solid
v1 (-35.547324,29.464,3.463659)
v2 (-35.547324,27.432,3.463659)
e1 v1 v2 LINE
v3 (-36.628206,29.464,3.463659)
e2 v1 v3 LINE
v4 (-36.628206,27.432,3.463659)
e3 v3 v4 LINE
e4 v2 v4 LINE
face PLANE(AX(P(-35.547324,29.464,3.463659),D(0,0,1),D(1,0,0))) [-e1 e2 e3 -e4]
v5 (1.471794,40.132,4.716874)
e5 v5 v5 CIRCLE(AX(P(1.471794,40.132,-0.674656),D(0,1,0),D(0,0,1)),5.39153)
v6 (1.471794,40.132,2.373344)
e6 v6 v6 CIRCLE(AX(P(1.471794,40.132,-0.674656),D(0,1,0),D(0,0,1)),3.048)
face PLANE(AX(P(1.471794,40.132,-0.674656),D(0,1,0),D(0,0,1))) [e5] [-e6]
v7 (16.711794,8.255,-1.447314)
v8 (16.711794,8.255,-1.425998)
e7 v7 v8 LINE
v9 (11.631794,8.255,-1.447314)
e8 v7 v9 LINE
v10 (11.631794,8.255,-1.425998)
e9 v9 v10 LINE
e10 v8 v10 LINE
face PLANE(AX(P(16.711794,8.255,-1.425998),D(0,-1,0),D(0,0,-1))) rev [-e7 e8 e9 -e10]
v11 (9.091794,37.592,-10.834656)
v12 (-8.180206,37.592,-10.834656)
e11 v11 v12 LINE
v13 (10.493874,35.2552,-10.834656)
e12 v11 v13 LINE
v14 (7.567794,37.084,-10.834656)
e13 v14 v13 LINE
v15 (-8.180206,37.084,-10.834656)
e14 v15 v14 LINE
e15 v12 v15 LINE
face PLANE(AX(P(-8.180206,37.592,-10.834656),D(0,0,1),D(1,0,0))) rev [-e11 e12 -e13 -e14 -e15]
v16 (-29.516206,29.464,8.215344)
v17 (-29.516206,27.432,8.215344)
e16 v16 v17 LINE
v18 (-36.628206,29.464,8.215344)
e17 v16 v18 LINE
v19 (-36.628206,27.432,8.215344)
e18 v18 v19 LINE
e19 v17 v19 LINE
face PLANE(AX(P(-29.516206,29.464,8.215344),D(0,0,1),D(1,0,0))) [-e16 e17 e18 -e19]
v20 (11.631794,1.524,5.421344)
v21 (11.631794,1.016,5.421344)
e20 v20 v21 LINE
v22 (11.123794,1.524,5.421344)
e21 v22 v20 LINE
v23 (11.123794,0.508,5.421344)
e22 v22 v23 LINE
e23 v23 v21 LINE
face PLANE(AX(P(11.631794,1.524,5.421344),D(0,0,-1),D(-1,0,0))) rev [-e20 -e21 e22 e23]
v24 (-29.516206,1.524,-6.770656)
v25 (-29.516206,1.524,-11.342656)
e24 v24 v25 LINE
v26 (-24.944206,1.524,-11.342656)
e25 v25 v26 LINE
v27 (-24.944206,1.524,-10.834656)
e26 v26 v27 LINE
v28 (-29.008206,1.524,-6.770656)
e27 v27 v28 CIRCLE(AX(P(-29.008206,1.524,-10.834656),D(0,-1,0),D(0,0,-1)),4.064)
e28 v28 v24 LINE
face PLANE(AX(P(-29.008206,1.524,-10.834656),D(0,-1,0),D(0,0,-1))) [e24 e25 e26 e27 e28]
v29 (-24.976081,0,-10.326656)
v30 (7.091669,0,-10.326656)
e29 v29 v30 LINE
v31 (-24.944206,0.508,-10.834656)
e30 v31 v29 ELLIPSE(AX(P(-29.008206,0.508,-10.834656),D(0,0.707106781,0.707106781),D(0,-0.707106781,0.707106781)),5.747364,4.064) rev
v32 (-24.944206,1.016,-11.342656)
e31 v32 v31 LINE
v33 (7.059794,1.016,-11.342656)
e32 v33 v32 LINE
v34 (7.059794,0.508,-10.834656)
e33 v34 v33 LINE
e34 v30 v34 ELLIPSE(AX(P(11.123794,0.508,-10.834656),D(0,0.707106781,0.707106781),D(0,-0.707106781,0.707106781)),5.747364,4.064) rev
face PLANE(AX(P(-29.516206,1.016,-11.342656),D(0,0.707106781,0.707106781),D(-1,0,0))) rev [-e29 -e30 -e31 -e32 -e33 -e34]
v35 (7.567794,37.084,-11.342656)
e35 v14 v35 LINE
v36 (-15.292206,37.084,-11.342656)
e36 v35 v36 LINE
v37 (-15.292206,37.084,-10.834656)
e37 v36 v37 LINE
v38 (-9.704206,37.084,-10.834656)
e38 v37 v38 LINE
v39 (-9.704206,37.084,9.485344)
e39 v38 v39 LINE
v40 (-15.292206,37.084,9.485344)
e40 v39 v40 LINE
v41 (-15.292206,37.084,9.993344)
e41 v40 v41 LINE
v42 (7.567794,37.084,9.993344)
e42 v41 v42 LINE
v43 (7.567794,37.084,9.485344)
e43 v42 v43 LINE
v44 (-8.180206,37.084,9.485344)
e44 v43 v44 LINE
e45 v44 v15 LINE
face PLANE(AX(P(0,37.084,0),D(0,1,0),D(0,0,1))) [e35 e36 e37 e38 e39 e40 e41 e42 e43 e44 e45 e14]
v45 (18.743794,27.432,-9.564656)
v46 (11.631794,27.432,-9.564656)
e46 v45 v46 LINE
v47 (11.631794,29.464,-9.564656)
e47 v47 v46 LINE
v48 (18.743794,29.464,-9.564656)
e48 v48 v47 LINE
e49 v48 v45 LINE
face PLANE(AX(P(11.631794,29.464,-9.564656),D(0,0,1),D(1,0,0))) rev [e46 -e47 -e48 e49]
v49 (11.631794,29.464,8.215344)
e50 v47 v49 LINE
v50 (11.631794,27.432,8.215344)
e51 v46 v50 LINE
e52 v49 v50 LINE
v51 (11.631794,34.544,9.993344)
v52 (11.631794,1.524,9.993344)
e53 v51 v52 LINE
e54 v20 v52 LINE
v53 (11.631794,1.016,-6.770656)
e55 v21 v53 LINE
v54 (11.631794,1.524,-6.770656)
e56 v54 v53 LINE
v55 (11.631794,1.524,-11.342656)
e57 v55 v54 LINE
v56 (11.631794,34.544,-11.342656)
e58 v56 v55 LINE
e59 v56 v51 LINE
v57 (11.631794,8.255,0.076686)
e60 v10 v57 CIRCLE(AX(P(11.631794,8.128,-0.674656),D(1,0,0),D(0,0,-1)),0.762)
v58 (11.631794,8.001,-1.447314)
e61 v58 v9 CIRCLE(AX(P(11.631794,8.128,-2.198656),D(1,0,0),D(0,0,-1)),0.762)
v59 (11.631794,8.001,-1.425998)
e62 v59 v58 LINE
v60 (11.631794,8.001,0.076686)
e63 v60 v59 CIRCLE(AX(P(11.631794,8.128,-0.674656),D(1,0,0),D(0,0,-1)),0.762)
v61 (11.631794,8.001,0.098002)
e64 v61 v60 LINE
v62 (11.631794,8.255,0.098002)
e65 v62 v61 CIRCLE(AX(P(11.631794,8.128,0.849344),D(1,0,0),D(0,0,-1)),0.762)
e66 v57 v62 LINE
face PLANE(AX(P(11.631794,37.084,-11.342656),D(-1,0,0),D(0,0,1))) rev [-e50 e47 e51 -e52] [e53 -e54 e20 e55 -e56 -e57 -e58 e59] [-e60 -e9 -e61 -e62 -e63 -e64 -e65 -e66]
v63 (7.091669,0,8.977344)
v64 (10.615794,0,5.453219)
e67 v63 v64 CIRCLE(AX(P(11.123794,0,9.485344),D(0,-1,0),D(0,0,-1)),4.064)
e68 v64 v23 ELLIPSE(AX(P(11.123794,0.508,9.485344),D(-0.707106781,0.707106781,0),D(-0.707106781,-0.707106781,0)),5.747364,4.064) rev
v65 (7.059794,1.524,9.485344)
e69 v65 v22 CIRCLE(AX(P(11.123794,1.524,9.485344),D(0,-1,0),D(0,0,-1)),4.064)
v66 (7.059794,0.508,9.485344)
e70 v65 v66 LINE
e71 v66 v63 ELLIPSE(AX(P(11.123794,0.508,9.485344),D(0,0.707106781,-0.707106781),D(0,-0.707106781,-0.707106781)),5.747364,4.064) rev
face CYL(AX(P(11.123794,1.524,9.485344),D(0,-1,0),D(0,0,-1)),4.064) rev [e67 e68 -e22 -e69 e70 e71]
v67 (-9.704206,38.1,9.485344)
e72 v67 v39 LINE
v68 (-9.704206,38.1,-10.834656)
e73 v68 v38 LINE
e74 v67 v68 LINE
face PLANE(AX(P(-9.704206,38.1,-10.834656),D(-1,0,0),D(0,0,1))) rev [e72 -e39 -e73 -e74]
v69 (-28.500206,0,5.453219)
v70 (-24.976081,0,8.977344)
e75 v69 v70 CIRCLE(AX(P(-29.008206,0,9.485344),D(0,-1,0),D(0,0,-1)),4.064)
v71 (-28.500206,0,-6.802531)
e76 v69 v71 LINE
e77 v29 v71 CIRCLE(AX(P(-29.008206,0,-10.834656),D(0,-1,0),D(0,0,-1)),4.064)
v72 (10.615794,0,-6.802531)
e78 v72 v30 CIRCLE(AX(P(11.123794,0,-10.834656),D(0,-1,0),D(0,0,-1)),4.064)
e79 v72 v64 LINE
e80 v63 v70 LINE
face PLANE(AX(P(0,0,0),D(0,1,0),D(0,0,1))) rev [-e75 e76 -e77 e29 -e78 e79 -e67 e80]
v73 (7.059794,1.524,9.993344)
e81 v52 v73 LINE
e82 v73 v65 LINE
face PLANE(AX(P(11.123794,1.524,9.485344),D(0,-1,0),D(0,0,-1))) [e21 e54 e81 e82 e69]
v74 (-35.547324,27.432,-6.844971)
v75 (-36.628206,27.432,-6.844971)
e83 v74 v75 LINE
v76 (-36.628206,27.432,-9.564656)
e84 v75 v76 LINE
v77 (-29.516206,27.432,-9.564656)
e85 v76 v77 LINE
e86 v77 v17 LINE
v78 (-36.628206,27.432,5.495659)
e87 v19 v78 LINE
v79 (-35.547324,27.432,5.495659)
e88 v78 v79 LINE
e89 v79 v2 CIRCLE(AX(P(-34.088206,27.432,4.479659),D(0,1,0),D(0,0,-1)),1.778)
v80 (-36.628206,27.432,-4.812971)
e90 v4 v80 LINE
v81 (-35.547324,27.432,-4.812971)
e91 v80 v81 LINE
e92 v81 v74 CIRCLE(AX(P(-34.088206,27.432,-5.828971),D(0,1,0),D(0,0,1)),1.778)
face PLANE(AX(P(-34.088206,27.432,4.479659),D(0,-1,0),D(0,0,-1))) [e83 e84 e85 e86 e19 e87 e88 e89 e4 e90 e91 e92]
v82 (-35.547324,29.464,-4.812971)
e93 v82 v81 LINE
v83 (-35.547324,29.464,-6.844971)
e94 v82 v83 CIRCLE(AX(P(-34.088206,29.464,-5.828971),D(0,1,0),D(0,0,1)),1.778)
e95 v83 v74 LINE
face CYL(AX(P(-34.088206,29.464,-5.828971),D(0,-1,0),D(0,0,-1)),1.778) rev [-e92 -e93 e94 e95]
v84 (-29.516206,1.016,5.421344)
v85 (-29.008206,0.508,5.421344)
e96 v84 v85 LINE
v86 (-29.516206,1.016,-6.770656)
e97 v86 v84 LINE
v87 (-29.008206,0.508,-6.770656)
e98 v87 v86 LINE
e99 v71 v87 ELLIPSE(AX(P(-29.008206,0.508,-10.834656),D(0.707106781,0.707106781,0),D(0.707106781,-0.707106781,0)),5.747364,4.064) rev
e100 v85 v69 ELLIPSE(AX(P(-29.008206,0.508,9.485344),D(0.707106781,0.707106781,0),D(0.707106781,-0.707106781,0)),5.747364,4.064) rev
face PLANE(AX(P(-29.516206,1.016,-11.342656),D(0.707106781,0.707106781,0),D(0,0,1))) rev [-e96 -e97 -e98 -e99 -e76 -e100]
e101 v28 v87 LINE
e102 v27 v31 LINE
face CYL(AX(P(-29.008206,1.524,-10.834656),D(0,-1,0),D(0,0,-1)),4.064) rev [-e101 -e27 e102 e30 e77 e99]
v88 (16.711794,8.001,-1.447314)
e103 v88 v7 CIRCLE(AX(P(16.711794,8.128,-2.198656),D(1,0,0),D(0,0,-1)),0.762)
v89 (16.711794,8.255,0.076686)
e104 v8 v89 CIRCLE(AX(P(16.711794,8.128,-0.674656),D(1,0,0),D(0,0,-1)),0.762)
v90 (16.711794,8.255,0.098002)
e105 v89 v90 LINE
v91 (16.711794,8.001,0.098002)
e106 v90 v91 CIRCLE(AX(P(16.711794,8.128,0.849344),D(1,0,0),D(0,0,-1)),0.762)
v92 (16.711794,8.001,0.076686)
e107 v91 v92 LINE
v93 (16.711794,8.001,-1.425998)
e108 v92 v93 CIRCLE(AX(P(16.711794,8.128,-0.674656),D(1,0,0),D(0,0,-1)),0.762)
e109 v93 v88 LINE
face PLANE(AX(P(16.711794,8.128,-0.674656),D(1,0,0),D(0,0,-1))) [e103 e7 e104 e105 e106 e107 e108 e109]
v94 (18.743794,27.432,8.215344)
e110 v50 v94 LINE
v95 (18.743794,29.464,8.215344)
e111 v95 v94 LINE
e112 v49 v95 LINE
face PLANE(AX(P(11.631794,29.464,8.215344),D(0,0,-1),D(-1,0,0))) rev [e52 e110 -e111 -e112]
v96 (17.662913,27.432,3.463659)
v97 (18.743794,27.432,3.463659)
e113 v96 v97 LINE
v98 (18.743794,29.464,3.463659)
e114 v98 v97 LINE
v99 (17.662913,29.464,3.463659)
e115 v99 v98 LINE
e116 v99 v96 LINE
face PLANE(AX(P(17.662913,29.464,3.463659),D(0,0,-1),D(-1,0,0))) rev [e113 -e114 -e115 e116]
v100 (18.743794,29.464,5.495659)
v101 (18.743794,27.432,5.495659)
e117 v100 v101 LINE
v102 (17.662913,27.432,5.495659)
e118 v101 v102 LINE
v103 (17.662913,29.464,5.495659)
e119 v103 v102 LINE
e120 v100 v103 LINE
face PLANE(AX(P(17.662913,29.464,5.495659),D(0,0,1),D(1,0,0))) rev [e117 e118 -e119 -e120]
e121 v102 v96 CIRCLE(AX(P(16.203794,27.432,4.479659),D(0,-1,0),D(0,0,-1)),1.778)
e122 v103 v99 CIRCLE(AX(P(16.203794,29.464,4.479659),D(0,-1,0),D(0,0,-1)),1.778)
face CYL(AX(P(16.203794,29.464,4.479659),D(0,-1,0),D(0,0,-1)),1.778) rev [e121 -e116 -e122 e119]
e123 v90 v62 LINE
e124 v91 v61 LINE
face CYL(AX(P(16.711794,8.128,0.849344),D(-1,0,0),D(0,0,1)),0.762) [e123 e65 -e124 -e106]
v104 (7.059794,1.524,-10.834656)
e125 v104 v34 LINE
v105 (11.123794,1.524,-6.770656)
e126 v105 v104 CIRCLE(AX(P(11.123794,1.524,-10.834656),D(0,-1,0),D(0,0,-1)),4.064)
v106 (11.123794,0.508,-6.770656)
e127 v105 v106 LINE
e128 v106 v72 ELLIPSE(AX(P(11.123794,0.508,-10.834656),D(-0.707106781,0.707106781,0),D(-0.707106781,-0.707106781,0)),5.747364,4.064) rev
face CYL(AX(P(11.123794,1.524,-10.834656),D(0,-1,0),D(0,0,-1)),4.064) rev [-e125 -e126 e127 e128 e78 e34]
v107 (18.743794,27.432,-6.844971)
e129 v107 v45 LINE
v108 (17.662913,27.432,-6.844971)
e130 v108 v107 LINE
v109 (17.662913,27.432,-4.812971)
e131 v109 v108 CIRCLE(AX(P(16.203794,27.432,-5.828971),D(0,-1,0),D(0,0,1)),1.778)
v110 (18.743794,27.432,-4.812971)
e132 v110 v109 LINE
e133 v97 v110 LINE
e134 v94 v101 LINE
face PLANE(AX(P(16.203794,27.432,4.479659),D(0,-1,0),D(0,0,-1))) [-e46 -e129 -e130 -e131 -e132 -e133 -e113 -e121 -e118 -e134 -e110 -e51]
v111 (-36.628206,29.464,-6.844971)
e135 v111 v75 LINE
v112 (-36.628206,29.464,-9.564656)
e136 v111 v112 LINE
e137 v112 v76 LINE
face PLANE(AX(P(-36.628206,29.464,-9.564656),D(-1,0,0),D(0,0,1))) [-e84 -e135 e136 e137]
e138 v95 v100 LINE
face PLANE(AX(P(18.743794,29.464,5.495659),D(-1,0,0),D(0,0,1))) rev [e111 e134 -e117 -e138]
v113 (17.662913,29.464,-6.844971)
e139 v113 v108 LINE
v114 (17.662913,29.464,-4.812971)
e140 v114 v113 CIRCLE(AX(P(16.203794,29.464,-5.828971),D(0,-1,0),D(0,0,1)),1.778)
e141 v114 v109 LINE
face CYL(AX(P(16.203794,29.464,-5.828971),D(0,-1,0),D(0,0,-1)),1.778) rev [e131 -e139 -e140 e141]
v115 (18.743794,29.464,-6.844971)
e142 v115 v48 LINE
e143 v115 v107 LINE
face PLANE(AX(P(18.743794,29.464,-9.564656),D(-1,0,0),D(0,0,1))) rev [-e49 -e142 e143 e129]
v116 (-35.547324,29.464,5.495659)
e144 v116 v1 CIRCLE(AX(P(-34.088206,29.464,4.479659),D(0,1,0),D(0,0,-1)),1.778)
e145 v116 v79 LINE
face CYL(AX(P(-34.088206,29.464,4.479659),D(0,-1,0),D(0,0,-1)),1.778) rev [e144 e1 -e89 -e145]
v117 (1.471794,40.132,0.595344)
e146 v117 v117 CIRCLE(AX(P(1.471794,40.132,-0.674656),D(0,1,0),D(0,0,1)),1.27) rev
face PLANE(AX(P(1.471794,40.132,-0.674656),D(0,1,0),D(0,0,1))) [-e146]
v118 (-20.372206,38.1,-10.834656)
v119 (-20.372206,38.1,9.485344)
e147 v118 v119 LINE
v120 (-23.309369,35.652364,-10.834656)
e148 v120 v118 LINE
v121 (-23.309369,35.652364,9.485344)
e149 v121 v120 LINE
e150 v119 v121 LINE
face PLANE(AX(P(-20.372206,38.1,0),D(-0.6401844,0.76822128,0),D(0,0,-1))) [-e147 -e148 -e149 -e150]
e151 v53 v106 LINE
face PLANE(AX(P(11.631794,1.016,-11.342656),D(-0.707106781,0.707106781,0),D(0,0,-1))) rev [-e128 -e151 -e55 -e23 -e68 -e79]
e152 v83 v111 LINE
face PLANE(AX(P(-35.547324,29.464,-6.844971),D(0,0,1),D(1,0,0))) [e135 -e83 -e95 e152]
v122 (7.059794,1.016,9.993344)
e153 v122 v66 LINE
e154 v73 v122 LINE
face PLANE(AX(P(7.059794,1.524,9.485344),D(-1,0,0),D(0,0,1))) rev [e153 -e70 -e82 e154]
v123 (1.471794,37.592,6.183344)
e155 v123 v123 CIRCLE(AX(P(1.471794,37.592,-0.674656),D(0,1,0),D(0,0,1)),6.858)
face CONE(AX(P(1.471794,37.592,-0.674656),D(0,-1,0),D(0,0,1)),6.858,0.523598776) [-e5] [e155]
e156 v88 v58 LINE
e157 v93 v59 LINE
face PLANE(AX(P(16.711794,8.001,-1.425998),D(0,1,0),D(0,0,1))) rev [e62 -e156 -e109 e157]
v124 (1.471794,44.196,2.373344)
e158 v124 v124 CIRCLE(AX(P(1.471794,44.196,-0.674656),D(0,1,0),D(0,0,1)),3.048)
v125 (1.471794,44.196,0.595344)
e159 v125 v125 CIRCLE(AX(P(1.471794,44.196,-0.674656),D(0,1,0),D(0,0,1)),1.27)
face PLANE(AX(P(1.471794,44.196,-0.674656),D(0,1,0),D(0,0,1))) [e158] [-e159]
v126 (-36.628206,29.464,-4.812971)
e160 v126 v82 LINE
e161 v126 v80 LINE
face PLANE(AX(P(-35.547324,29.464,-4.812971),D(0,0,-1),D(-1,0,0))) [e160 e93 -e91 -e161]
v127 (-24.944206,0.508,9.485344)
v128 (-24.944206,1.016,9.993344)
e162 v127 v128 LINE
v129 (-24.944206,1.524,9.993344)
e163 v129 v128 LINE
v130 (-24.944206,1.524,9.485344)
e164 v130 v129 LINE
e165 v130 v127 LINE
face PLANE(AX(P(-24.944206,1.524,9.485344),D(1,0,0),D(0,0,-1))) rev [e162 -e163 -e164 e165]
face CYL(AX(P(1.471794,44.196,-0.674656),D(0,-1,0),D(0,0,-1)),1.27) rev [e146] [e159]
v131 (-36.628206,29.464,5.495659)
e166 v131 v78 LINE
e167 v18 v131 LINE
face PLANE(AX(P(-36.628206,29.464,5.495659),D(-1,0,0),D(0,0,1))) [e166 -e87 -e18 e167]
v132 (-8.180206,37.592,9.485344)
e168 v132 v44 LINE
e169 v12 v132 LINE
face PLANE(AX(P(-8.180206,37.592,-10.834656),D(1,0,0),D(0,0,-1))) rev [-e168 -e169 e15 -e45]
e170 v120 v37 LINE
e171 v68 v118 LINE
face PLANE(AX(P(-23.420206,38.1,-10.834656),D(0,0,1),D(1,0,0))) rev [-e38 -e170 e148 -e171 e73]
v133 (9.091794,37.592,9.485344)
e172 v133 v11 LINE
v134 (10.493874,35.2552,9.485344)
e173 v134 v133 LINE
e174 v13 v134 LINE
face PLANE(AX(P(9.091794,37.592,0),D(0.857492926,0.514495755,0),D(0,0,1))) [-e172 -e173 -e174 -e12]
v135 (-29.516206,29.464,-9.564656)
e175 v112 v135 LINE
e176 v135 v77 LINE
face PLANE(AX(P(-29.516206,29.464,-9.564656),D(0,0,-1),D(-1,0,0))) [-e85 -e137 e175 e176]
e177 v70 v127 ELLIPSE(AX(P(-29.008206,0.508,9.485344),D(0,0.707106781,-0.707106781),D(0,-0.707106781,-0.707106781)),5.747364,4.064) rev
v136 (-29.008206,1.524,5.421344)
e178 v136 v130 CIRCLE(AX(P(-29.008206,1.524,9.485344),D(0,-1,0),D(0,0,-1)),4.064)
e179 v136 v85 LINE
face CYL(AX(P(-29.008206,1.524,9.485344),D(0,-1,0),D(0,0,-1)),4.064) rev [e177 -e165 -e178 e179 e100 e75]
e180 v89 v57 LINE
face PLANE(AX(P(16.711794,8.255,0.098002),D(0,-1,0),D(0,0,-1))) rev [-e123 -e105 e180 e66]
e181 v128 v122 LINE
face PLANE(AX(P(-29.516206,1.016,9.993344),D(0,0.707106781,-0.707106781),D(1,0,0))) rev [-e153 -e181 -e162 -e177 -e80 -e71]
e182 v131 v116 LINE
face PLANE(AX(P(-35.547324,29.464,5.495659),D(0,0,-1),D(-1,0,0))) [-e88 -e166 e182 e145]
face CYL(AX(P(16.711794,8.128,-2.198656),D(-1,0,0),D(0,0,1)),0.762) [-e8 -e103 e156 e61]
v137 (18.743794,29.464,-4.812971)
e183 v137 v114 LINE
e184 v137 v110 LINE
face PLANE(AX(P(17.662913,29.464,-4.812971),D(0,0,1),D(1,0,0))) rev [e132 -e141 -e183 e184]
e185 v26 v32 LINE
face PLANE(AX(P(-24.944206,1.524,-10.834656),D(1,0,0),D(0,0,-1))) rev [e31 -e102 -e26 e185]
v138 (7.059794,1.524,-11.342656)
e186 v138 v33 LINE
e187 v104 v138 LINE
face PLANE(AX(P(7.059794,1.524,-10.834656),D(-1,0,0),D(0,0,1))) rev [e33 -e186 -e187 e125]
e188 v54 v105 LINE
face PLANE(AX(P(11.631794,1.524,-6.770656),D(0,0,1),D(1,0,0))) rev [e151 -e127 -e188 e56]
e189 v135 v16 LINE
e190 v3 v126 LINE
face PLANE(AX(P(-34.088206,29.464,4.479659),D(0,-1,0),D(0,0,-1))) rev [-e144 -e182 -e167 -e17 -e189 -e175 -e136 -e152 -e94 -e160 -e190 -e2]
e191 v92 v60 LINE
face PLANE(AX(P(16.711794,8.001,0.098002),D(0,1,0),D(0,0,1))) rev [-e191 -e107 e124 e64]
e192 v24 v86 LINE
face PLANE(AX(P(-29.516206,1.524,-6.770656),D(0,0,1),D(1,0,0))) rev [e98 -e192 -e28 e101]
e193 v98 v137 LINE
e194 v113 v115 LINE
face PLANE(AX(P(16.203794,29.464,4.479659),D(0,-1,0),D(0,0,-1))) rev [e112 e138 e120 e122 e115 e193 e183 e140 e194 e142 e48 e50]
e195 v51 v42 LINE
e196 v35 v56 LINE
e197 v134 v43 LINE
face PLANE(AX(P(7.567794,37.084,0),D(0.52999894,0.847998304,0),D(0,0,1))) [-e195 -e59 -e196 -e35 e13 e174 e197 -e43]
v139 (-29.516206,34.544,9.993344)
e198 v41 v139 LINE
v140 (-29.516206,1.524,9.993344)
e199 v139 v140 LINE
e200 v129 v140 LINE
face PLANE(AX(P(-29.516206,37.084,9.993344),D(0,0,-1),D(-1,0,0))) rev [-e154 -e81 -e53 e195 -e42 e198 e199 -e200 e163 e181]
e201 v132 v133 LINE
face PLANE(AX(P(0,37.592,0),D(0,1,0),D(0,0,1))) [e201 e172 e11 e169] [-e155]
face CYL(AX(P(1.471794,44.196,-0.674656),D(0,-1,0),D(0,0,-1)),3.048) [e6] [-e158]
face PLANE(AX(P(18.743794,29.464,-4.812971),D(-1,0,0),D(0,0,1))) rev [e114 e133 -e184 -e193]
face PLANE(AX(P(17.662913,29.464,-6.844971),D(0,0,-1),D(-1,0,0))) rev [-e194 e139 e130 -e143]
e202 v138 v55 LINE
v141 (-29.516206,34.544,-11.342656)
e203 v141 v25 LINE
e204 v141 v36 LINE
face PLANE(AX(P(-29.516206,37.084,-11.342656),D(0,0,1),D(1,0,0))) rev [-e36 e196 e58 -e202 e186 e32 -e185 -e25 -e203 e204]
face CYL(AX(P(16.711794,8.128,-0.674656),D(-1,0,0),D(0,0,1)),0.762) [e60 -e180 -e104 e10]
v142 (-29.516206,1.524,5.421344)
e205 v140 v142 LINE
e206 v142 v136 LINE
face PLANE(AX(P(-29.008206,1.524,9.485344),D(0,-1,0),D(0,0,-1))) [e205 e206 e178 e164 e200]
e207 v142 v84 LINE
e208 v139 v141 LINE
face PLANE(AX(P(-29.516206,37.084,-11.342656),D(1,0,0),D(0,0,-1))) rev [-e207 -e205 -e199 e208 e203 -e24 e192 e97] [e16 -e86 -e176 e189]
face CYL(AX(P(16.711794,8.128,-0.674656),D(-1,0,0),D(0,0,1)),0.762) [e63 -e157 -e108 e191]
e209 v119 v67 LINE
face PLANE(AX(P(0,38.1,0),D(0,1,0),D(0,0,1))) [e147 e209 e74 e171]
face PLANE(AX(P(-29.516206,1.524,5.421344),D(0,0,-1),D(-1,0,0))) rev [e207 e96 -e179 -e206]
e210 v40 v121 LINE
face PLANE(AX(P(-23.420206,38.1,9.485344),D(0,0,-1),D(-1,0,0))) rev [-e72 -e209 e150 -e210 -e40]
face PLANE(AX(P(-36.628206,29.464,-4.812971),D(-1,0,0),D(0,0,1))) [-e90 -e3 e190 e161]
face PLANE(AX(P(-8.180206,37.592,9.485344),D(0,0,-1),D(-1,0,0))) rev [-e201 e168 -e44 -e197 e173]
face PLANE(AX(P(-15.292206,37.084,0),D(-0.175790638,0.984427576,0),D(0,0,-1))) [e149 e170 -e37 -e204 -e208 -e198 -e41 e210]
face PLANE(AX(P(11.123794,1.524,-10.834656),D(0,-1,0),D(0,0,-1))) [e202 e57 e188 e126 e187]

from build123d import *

# Parameters (mm, degrees)
SKETCH1_W           = 41.148
SKETCH1_H           = 21.336
BOSS_EXTRUDE1_DEPTH = 37.084
CHAMFER1_SIZE       = 2.54
CHAMFER1_SIZE2      = 14.224
CHAMFER2_SIZE       = 2.54
CHAMFER2_SIZE2      = 4.064
SKETCH3_W           = 18.796
SKETCH3_H           = 20.32
BOSS_EXTRUDE2_DEPTH = 2.54
CHAMFER3_SIZE       = 2.54
CHAMFER3_SIZE_2     = 1.524
SKETCH4_W           = 13.716
SKETCH4_H           = 20.32
BOSS_EXTRUDE3_DEPTH = 3.556
CHAMFER4_SIZE       = 2.54
CHAMFER4_SIZE_2     = 3.048
SKETCH5_R           = 6.858
BOSS_EXTRUDE4_DEPTH = 2.54
BOSS_EXTRUDE4_TAPER = 30
SKETCH6_R           = 3.048
SKETCH6_R_2         = 1.27
BOSS_EXTRUDE5_DEPTH = 4.064
BOSS_EXTRUDE6_DEPTH = 2.032
CHAMFER5_SIZE       = 1.016
CUT_EXTRUDE1_DEPTH  = 1.524
BOSS_EXTRUDE7_DEPTH = 5.08


with BuildPart() as part:
    # Sketch1 → Boss-Extrude1 (new body)
    with BuildSketch(Plane(origin=(0, 0, 0), x_dir=(1, 0, 0), z_dir=(0, 1, 0))):
        with Locations((-8.942205534, 0.674656126)):
            Rectangle(SKETCH1_W, SKETCH1_H)
    extrude(amount=BOSS_EXTRUDE1_DEPTH)

    # Chamfer1
    chamfer1_edges = [part.edges().sort_by_distance(p)[0] for p in [
        (-29.516205534, 37.084, -0.674656126),
    ]]
    chamfer1_side = [part.faces().sort_by_distance(p)[0] for p in [
        (-29.516205534, 18.542, -0.674656126),
    ]]
    chamfer(chamfer1_edges, length=CHAMFER1_SIZE, length2=CHAMFER1_SIZE2, reference=chamfer1_side[0])

    # Chamfer2
    chamfer2_edges = [part.edges().sort_by_distance(p)[0] for p in [
        (11.631794466, 37.084, -0.674656126),
    ]]
    chamfer2_side = [part.faces().sort_by_distance(p)[0] for p in [
        (11.631794466, 18.542, -0.674656126),
    ]]
    chamfer(chamfer2_edges, length=CHAMFER2_SIZE, length2=CHAMFER2_SIZE2, reference=chamfer2_side[0])

    # Sketch3 → Boss-Extrude2 (add)
    with BuildSketch(Plane(origin=(0, 35.052, 0), x_dir=(1, 0, 0), z_dir=(0, 1, 0))):
        with Locations((1.217794466, 0.674656126)):
            Rectangle(SKETCH3_W, SKETCH3_H)
    extrude(amount=BOSS_EXTRUDE2_DEPTH)

    # Chamfer3
    # the kernel refuses this chamfer: 2.54, 1.524 mm, written as the material it takes off along each edge
    with BuildSketch(Plane(origin=(10.615794466, 37.592, -17.403759313), x_dir=(0.019893418958582338, -0.9998021063601228, 0), z_dir=(0, 0, 1))) as chamfer3_piece_1_section:
        Polygon((CHAMFER3_SIZE * 0.99980210636, -CHAMFER3_SIZE * 0.0198934189586), (-CHAMFER3_SIZE_2 * 0.0198934189586, -CHAMFER3_SIZE_2 * 0.99980210636), (0, 0), align=None)
    chamfer3_piece_1 = extrude(amount=33.458206374, mode=Mode.PRIVATE)
    chamfer3_piece_1 = split(chamfer3_piece_1, bisect_by=Plane(origin=(9.549275809, 35.845574161, -0.674656126), z_dir=(0.5299989400031799, 0.8479983040050881, 0)), keep=Keep.TOP, mode=Mode.PRIVATE)
    add(chamfer3_piece_1, mode=Mode.SUBTRACT)

    # Sketch4 → Boss-Extrude3 (add)
    with BuildSketch(Plane(origin=(0, 34.544, 0), x_dir=(1, 0, 0), z_dir=(0, 1, 0))):
        with Locations((-16.562205534, 0.674656126)):
            Rectangle(SKETCH4_W, SKETCH4_H)
    extrude(amount=BOSS_EXTRUDE3_DEPTH)

    # Chamfer4
    # the kernel refuses this chamfer: 3.048, 2.54 mm, written as the material it takes off along each edge
    with BuildSketch(Plane(origin=(-23.420205534, 38.1, 17.341921223), x_dir=(-0.03575241599375306, -0.9993606780090006, 0), z_dir=(0, 0, -1))) as chamfer4_piece_1_section:
        Polygon((CHAMFER4_SIZE * 0.999360678009, -CHAMFER4_SIZE * 0.0357524159938), (-CHAMFER4_SIZE_2 * 0.0357524159938, -CHAMFER4_SIZE_2 * 0.999360678009), (0, 0), align=None)
    chamfer4_piece_1 = extrude(amount=36.0331547, mode=Mode.PRIVATE)
    chamfer4_piece_1 = split(chamfer4_piece_1, bisect_by=Plane(origin=(-22.151753268, 35.859080762, -0.674656126), z_dir=(-0.17579063848365747, 0.984427575508482, 0)), keep=Keep.TOP, mode=Mode.PRIVATE)
    add(chamfer4_piece_1, mode=Mode.SUBTRACT)

    # Sketch5 → Boss-Extrude4 (add)
    with BuildSketch(Plane(origin=(0, 37.592, 0), x_dir=(1, 0, 0), z_dir=(0, 1, 0))):
        with Locations((1.471794466, 0.674656126)):
            Circle(SKETCH5_R)
    extrude(amount=BOSS_EXTRUDE4_DEPTH, taper=BOSS_EXTRUDE4_TAPER)

    # Sketch6 → Boss-Extrude5 (add)
    with BuildSketch(Plane(origin=(0, 40.132, 0), x_dir=(1, 0, 0), z_dir=(0, 1, 0))):
        with Locations(Location((1.471794466, 0.674656126, 0), (0, 0, 270))):
            Circle(SKETCH6_R)
        with Locations(Location((1.471794466, 0.674656126, 0), (0, 0, 270))):
            Circle(SKETCH6_R_2, mode=Mode.SUBTRACT)
    extrude(amount=BOSS_EXTRUDE5_DEPTH)

    # Sketch7 → Boss-Extrude6 (add)
    with BuildSketch(Plane(origin=(0, 27.432, 0), x_dir=(-1, 0, 0), z_dir=(0, -1, 0))):
        with BuildLine():
            Line((29.516205534, 9.564656126), (36.628205534, 9.564656126))
            Line((36.628205534, 9.564656126), (36.628205534, 6.84497112))
            Line((36.628205534, 6.84497112), (35.547324446, 6.84497112))
            ThreePointArc((35.547324446, 6.84497112), (32.310205534, 5.82897112), (35.547324446, 4.81297112))
            Line((35.547324446, 4.81297112), (36.628205534, 4.81297112))
            Line((36.628205534, 4.81297112), (36.628205534, -3.463658867))
            Line((36.628205534, -3.463658867), (35.547324446, -3.463658867))
            ThreePointArc((35.547324446, -3.463658867), (32.310205534, -4.479658867), (35.547324446, -5.495658867))
            Line((35.547324446, -5.495658867), (36.628205534, -5.495658867))
            Line((36.628205534, -5.495658867), (36.628205534, -8.215343874))
            Line((36.628205534, -8.215343874), (29.516205534, -8.215343874))
            Line((29.516205534, -8.215343874), (29.516205534, 9.564656126))
        make_face()
    boss_extrude6 = extrude(amount=-BOSS_EXTRUDE6_DEPTH)

    # Mirror1: Boss-Extrude6 across plane
    add(boss_extrude6.mirror(Plane(origin=(-8.942205534, 0, 0), x_dir=(0, 0, 1), z_dir=(1, 0, 0))))

    # Chamfer5
    chamfer5_edges = [part.edges().sort_by_distance(p)[0] for p in [
        (-8.942205534, 0, -11.342656126),
        (11.631794466, 0, -0.674656126),
        (-8.942205534, 0, 9.993343874),
        (-29.516205534, 0, -0.674656126),
    ]]
    chamfer(chamfer5_edges, length=CHAMFER5_SIZE)

    # Sketch8 → Cut-Extrude1 (cut)
    with BuildSketch(Plane.XZ):
        with BuildLine():
            Line((-29.516205534, 9.993343874), (-24.944205534, 9.993343874))
            Line((-24.944205534, 9.993343874), (-24.944205534, 9.485343874))
            ThreePointArc((-24.944205534, 9.485343874), (-26.134523575, 6.611661915), (-29.008205534, 5.421343874))
            Line((-29.008205534, 5.421343874), (-29.516205534, 5.421343874))
            Line((-29.516205534, 5.421343874), (-29.516205534, 9.993343874))
        make_face()
        with BuildLine():
            Line((-29.516205534, -11.342656126), (-29.516205534, -6.770656126))
            Line((-29.516205534, -6.770656126), (-29.008205534, -6.770656126))
            ThreePointArc((-29.008205534, -6.770656126), (-26.134523575, -7.960974168), (-24.944205534, -10.834656126))
            Line((-24.944205534, -10.834656126), (-24.944205534, -11.342656126))
            Line((-24.944205534, -11.342656126), (-29.516205534, -11.342656126))
        make_face()
        with BuildLine():
            Line((11.631794466, -11.342656126), (7.059794466, -11.342656126))
            Line((7.059794466, -11.342656126), (7.059794466, -10.834656126))
            ThreePointArc((7.059794466, -10.834656126), (8.250112508, -7.960974168), (11.123794466, -6.770656126))
            Line((11.123794466, -6.770656126), (11.631794466, -6.770656126))
            Line((11.631794466, -6.770656126), (11.631794466, -11.342656126))
        make_face()
        with BuildLine():
            Line((11.631794466, 9.993343874), (11.631794466, 5.421343874))
            Line((11.631794466, 5.421343874), (11.123794466, 5.421343874))
            ThreePointArc((11.123794466, 5.421343874), (8.250112508, 6.611661915), (7.059794466, 9.485343874))
            Line((7.059794466, 9.485343874), (7.059794466, 9.993343874))
            Line((7.059794466, 9.993343874), (11.631794466, 9.993343874))
        make_face()
    extrude(amount=-CUT_EXTRUDE1_DEPTH, mode=Mode.SUBTRACT)

    # Sketch9 → Boss-Extrude7 (add)
    with BuildSketch(Plane(origin=(11.631794466, 0, 0), x_dir=(0, 0, -1), z_dir=(1, 0, 0))):
        with BuildLine():
            Line((-0.098001741, 8.255), (-0.076686006, 8.255))
            ThreePointArc((-0.076686006, 8.255), (0.674656126, 8.89), (1.425998259, 8.255))
            Line((1.425998259, 8.255), (1.447313994, 8.255))
            ThreePointArc((1.447313994, 8.255), (2.960656126, 8.128), (1.447313994, 8.001))
            Line((1.447313994, 8.001), (1.425998259, 8.001))
            ThreePointArc((1.425998259, 8.001), (0.674656126, 7.366), (-0.076686006, 8.001))
            Line((-0.076686006, 8.001), (-0.098001741, 8.001))
            ThreePointArc((-0.098001741, 8.001), (-1.611343874, 8.128), (-0.098001741, 8.255))
        make_face()
    extrude(amount=BOSS_EXTRUDE7_DEPTH)


solid = part.part
